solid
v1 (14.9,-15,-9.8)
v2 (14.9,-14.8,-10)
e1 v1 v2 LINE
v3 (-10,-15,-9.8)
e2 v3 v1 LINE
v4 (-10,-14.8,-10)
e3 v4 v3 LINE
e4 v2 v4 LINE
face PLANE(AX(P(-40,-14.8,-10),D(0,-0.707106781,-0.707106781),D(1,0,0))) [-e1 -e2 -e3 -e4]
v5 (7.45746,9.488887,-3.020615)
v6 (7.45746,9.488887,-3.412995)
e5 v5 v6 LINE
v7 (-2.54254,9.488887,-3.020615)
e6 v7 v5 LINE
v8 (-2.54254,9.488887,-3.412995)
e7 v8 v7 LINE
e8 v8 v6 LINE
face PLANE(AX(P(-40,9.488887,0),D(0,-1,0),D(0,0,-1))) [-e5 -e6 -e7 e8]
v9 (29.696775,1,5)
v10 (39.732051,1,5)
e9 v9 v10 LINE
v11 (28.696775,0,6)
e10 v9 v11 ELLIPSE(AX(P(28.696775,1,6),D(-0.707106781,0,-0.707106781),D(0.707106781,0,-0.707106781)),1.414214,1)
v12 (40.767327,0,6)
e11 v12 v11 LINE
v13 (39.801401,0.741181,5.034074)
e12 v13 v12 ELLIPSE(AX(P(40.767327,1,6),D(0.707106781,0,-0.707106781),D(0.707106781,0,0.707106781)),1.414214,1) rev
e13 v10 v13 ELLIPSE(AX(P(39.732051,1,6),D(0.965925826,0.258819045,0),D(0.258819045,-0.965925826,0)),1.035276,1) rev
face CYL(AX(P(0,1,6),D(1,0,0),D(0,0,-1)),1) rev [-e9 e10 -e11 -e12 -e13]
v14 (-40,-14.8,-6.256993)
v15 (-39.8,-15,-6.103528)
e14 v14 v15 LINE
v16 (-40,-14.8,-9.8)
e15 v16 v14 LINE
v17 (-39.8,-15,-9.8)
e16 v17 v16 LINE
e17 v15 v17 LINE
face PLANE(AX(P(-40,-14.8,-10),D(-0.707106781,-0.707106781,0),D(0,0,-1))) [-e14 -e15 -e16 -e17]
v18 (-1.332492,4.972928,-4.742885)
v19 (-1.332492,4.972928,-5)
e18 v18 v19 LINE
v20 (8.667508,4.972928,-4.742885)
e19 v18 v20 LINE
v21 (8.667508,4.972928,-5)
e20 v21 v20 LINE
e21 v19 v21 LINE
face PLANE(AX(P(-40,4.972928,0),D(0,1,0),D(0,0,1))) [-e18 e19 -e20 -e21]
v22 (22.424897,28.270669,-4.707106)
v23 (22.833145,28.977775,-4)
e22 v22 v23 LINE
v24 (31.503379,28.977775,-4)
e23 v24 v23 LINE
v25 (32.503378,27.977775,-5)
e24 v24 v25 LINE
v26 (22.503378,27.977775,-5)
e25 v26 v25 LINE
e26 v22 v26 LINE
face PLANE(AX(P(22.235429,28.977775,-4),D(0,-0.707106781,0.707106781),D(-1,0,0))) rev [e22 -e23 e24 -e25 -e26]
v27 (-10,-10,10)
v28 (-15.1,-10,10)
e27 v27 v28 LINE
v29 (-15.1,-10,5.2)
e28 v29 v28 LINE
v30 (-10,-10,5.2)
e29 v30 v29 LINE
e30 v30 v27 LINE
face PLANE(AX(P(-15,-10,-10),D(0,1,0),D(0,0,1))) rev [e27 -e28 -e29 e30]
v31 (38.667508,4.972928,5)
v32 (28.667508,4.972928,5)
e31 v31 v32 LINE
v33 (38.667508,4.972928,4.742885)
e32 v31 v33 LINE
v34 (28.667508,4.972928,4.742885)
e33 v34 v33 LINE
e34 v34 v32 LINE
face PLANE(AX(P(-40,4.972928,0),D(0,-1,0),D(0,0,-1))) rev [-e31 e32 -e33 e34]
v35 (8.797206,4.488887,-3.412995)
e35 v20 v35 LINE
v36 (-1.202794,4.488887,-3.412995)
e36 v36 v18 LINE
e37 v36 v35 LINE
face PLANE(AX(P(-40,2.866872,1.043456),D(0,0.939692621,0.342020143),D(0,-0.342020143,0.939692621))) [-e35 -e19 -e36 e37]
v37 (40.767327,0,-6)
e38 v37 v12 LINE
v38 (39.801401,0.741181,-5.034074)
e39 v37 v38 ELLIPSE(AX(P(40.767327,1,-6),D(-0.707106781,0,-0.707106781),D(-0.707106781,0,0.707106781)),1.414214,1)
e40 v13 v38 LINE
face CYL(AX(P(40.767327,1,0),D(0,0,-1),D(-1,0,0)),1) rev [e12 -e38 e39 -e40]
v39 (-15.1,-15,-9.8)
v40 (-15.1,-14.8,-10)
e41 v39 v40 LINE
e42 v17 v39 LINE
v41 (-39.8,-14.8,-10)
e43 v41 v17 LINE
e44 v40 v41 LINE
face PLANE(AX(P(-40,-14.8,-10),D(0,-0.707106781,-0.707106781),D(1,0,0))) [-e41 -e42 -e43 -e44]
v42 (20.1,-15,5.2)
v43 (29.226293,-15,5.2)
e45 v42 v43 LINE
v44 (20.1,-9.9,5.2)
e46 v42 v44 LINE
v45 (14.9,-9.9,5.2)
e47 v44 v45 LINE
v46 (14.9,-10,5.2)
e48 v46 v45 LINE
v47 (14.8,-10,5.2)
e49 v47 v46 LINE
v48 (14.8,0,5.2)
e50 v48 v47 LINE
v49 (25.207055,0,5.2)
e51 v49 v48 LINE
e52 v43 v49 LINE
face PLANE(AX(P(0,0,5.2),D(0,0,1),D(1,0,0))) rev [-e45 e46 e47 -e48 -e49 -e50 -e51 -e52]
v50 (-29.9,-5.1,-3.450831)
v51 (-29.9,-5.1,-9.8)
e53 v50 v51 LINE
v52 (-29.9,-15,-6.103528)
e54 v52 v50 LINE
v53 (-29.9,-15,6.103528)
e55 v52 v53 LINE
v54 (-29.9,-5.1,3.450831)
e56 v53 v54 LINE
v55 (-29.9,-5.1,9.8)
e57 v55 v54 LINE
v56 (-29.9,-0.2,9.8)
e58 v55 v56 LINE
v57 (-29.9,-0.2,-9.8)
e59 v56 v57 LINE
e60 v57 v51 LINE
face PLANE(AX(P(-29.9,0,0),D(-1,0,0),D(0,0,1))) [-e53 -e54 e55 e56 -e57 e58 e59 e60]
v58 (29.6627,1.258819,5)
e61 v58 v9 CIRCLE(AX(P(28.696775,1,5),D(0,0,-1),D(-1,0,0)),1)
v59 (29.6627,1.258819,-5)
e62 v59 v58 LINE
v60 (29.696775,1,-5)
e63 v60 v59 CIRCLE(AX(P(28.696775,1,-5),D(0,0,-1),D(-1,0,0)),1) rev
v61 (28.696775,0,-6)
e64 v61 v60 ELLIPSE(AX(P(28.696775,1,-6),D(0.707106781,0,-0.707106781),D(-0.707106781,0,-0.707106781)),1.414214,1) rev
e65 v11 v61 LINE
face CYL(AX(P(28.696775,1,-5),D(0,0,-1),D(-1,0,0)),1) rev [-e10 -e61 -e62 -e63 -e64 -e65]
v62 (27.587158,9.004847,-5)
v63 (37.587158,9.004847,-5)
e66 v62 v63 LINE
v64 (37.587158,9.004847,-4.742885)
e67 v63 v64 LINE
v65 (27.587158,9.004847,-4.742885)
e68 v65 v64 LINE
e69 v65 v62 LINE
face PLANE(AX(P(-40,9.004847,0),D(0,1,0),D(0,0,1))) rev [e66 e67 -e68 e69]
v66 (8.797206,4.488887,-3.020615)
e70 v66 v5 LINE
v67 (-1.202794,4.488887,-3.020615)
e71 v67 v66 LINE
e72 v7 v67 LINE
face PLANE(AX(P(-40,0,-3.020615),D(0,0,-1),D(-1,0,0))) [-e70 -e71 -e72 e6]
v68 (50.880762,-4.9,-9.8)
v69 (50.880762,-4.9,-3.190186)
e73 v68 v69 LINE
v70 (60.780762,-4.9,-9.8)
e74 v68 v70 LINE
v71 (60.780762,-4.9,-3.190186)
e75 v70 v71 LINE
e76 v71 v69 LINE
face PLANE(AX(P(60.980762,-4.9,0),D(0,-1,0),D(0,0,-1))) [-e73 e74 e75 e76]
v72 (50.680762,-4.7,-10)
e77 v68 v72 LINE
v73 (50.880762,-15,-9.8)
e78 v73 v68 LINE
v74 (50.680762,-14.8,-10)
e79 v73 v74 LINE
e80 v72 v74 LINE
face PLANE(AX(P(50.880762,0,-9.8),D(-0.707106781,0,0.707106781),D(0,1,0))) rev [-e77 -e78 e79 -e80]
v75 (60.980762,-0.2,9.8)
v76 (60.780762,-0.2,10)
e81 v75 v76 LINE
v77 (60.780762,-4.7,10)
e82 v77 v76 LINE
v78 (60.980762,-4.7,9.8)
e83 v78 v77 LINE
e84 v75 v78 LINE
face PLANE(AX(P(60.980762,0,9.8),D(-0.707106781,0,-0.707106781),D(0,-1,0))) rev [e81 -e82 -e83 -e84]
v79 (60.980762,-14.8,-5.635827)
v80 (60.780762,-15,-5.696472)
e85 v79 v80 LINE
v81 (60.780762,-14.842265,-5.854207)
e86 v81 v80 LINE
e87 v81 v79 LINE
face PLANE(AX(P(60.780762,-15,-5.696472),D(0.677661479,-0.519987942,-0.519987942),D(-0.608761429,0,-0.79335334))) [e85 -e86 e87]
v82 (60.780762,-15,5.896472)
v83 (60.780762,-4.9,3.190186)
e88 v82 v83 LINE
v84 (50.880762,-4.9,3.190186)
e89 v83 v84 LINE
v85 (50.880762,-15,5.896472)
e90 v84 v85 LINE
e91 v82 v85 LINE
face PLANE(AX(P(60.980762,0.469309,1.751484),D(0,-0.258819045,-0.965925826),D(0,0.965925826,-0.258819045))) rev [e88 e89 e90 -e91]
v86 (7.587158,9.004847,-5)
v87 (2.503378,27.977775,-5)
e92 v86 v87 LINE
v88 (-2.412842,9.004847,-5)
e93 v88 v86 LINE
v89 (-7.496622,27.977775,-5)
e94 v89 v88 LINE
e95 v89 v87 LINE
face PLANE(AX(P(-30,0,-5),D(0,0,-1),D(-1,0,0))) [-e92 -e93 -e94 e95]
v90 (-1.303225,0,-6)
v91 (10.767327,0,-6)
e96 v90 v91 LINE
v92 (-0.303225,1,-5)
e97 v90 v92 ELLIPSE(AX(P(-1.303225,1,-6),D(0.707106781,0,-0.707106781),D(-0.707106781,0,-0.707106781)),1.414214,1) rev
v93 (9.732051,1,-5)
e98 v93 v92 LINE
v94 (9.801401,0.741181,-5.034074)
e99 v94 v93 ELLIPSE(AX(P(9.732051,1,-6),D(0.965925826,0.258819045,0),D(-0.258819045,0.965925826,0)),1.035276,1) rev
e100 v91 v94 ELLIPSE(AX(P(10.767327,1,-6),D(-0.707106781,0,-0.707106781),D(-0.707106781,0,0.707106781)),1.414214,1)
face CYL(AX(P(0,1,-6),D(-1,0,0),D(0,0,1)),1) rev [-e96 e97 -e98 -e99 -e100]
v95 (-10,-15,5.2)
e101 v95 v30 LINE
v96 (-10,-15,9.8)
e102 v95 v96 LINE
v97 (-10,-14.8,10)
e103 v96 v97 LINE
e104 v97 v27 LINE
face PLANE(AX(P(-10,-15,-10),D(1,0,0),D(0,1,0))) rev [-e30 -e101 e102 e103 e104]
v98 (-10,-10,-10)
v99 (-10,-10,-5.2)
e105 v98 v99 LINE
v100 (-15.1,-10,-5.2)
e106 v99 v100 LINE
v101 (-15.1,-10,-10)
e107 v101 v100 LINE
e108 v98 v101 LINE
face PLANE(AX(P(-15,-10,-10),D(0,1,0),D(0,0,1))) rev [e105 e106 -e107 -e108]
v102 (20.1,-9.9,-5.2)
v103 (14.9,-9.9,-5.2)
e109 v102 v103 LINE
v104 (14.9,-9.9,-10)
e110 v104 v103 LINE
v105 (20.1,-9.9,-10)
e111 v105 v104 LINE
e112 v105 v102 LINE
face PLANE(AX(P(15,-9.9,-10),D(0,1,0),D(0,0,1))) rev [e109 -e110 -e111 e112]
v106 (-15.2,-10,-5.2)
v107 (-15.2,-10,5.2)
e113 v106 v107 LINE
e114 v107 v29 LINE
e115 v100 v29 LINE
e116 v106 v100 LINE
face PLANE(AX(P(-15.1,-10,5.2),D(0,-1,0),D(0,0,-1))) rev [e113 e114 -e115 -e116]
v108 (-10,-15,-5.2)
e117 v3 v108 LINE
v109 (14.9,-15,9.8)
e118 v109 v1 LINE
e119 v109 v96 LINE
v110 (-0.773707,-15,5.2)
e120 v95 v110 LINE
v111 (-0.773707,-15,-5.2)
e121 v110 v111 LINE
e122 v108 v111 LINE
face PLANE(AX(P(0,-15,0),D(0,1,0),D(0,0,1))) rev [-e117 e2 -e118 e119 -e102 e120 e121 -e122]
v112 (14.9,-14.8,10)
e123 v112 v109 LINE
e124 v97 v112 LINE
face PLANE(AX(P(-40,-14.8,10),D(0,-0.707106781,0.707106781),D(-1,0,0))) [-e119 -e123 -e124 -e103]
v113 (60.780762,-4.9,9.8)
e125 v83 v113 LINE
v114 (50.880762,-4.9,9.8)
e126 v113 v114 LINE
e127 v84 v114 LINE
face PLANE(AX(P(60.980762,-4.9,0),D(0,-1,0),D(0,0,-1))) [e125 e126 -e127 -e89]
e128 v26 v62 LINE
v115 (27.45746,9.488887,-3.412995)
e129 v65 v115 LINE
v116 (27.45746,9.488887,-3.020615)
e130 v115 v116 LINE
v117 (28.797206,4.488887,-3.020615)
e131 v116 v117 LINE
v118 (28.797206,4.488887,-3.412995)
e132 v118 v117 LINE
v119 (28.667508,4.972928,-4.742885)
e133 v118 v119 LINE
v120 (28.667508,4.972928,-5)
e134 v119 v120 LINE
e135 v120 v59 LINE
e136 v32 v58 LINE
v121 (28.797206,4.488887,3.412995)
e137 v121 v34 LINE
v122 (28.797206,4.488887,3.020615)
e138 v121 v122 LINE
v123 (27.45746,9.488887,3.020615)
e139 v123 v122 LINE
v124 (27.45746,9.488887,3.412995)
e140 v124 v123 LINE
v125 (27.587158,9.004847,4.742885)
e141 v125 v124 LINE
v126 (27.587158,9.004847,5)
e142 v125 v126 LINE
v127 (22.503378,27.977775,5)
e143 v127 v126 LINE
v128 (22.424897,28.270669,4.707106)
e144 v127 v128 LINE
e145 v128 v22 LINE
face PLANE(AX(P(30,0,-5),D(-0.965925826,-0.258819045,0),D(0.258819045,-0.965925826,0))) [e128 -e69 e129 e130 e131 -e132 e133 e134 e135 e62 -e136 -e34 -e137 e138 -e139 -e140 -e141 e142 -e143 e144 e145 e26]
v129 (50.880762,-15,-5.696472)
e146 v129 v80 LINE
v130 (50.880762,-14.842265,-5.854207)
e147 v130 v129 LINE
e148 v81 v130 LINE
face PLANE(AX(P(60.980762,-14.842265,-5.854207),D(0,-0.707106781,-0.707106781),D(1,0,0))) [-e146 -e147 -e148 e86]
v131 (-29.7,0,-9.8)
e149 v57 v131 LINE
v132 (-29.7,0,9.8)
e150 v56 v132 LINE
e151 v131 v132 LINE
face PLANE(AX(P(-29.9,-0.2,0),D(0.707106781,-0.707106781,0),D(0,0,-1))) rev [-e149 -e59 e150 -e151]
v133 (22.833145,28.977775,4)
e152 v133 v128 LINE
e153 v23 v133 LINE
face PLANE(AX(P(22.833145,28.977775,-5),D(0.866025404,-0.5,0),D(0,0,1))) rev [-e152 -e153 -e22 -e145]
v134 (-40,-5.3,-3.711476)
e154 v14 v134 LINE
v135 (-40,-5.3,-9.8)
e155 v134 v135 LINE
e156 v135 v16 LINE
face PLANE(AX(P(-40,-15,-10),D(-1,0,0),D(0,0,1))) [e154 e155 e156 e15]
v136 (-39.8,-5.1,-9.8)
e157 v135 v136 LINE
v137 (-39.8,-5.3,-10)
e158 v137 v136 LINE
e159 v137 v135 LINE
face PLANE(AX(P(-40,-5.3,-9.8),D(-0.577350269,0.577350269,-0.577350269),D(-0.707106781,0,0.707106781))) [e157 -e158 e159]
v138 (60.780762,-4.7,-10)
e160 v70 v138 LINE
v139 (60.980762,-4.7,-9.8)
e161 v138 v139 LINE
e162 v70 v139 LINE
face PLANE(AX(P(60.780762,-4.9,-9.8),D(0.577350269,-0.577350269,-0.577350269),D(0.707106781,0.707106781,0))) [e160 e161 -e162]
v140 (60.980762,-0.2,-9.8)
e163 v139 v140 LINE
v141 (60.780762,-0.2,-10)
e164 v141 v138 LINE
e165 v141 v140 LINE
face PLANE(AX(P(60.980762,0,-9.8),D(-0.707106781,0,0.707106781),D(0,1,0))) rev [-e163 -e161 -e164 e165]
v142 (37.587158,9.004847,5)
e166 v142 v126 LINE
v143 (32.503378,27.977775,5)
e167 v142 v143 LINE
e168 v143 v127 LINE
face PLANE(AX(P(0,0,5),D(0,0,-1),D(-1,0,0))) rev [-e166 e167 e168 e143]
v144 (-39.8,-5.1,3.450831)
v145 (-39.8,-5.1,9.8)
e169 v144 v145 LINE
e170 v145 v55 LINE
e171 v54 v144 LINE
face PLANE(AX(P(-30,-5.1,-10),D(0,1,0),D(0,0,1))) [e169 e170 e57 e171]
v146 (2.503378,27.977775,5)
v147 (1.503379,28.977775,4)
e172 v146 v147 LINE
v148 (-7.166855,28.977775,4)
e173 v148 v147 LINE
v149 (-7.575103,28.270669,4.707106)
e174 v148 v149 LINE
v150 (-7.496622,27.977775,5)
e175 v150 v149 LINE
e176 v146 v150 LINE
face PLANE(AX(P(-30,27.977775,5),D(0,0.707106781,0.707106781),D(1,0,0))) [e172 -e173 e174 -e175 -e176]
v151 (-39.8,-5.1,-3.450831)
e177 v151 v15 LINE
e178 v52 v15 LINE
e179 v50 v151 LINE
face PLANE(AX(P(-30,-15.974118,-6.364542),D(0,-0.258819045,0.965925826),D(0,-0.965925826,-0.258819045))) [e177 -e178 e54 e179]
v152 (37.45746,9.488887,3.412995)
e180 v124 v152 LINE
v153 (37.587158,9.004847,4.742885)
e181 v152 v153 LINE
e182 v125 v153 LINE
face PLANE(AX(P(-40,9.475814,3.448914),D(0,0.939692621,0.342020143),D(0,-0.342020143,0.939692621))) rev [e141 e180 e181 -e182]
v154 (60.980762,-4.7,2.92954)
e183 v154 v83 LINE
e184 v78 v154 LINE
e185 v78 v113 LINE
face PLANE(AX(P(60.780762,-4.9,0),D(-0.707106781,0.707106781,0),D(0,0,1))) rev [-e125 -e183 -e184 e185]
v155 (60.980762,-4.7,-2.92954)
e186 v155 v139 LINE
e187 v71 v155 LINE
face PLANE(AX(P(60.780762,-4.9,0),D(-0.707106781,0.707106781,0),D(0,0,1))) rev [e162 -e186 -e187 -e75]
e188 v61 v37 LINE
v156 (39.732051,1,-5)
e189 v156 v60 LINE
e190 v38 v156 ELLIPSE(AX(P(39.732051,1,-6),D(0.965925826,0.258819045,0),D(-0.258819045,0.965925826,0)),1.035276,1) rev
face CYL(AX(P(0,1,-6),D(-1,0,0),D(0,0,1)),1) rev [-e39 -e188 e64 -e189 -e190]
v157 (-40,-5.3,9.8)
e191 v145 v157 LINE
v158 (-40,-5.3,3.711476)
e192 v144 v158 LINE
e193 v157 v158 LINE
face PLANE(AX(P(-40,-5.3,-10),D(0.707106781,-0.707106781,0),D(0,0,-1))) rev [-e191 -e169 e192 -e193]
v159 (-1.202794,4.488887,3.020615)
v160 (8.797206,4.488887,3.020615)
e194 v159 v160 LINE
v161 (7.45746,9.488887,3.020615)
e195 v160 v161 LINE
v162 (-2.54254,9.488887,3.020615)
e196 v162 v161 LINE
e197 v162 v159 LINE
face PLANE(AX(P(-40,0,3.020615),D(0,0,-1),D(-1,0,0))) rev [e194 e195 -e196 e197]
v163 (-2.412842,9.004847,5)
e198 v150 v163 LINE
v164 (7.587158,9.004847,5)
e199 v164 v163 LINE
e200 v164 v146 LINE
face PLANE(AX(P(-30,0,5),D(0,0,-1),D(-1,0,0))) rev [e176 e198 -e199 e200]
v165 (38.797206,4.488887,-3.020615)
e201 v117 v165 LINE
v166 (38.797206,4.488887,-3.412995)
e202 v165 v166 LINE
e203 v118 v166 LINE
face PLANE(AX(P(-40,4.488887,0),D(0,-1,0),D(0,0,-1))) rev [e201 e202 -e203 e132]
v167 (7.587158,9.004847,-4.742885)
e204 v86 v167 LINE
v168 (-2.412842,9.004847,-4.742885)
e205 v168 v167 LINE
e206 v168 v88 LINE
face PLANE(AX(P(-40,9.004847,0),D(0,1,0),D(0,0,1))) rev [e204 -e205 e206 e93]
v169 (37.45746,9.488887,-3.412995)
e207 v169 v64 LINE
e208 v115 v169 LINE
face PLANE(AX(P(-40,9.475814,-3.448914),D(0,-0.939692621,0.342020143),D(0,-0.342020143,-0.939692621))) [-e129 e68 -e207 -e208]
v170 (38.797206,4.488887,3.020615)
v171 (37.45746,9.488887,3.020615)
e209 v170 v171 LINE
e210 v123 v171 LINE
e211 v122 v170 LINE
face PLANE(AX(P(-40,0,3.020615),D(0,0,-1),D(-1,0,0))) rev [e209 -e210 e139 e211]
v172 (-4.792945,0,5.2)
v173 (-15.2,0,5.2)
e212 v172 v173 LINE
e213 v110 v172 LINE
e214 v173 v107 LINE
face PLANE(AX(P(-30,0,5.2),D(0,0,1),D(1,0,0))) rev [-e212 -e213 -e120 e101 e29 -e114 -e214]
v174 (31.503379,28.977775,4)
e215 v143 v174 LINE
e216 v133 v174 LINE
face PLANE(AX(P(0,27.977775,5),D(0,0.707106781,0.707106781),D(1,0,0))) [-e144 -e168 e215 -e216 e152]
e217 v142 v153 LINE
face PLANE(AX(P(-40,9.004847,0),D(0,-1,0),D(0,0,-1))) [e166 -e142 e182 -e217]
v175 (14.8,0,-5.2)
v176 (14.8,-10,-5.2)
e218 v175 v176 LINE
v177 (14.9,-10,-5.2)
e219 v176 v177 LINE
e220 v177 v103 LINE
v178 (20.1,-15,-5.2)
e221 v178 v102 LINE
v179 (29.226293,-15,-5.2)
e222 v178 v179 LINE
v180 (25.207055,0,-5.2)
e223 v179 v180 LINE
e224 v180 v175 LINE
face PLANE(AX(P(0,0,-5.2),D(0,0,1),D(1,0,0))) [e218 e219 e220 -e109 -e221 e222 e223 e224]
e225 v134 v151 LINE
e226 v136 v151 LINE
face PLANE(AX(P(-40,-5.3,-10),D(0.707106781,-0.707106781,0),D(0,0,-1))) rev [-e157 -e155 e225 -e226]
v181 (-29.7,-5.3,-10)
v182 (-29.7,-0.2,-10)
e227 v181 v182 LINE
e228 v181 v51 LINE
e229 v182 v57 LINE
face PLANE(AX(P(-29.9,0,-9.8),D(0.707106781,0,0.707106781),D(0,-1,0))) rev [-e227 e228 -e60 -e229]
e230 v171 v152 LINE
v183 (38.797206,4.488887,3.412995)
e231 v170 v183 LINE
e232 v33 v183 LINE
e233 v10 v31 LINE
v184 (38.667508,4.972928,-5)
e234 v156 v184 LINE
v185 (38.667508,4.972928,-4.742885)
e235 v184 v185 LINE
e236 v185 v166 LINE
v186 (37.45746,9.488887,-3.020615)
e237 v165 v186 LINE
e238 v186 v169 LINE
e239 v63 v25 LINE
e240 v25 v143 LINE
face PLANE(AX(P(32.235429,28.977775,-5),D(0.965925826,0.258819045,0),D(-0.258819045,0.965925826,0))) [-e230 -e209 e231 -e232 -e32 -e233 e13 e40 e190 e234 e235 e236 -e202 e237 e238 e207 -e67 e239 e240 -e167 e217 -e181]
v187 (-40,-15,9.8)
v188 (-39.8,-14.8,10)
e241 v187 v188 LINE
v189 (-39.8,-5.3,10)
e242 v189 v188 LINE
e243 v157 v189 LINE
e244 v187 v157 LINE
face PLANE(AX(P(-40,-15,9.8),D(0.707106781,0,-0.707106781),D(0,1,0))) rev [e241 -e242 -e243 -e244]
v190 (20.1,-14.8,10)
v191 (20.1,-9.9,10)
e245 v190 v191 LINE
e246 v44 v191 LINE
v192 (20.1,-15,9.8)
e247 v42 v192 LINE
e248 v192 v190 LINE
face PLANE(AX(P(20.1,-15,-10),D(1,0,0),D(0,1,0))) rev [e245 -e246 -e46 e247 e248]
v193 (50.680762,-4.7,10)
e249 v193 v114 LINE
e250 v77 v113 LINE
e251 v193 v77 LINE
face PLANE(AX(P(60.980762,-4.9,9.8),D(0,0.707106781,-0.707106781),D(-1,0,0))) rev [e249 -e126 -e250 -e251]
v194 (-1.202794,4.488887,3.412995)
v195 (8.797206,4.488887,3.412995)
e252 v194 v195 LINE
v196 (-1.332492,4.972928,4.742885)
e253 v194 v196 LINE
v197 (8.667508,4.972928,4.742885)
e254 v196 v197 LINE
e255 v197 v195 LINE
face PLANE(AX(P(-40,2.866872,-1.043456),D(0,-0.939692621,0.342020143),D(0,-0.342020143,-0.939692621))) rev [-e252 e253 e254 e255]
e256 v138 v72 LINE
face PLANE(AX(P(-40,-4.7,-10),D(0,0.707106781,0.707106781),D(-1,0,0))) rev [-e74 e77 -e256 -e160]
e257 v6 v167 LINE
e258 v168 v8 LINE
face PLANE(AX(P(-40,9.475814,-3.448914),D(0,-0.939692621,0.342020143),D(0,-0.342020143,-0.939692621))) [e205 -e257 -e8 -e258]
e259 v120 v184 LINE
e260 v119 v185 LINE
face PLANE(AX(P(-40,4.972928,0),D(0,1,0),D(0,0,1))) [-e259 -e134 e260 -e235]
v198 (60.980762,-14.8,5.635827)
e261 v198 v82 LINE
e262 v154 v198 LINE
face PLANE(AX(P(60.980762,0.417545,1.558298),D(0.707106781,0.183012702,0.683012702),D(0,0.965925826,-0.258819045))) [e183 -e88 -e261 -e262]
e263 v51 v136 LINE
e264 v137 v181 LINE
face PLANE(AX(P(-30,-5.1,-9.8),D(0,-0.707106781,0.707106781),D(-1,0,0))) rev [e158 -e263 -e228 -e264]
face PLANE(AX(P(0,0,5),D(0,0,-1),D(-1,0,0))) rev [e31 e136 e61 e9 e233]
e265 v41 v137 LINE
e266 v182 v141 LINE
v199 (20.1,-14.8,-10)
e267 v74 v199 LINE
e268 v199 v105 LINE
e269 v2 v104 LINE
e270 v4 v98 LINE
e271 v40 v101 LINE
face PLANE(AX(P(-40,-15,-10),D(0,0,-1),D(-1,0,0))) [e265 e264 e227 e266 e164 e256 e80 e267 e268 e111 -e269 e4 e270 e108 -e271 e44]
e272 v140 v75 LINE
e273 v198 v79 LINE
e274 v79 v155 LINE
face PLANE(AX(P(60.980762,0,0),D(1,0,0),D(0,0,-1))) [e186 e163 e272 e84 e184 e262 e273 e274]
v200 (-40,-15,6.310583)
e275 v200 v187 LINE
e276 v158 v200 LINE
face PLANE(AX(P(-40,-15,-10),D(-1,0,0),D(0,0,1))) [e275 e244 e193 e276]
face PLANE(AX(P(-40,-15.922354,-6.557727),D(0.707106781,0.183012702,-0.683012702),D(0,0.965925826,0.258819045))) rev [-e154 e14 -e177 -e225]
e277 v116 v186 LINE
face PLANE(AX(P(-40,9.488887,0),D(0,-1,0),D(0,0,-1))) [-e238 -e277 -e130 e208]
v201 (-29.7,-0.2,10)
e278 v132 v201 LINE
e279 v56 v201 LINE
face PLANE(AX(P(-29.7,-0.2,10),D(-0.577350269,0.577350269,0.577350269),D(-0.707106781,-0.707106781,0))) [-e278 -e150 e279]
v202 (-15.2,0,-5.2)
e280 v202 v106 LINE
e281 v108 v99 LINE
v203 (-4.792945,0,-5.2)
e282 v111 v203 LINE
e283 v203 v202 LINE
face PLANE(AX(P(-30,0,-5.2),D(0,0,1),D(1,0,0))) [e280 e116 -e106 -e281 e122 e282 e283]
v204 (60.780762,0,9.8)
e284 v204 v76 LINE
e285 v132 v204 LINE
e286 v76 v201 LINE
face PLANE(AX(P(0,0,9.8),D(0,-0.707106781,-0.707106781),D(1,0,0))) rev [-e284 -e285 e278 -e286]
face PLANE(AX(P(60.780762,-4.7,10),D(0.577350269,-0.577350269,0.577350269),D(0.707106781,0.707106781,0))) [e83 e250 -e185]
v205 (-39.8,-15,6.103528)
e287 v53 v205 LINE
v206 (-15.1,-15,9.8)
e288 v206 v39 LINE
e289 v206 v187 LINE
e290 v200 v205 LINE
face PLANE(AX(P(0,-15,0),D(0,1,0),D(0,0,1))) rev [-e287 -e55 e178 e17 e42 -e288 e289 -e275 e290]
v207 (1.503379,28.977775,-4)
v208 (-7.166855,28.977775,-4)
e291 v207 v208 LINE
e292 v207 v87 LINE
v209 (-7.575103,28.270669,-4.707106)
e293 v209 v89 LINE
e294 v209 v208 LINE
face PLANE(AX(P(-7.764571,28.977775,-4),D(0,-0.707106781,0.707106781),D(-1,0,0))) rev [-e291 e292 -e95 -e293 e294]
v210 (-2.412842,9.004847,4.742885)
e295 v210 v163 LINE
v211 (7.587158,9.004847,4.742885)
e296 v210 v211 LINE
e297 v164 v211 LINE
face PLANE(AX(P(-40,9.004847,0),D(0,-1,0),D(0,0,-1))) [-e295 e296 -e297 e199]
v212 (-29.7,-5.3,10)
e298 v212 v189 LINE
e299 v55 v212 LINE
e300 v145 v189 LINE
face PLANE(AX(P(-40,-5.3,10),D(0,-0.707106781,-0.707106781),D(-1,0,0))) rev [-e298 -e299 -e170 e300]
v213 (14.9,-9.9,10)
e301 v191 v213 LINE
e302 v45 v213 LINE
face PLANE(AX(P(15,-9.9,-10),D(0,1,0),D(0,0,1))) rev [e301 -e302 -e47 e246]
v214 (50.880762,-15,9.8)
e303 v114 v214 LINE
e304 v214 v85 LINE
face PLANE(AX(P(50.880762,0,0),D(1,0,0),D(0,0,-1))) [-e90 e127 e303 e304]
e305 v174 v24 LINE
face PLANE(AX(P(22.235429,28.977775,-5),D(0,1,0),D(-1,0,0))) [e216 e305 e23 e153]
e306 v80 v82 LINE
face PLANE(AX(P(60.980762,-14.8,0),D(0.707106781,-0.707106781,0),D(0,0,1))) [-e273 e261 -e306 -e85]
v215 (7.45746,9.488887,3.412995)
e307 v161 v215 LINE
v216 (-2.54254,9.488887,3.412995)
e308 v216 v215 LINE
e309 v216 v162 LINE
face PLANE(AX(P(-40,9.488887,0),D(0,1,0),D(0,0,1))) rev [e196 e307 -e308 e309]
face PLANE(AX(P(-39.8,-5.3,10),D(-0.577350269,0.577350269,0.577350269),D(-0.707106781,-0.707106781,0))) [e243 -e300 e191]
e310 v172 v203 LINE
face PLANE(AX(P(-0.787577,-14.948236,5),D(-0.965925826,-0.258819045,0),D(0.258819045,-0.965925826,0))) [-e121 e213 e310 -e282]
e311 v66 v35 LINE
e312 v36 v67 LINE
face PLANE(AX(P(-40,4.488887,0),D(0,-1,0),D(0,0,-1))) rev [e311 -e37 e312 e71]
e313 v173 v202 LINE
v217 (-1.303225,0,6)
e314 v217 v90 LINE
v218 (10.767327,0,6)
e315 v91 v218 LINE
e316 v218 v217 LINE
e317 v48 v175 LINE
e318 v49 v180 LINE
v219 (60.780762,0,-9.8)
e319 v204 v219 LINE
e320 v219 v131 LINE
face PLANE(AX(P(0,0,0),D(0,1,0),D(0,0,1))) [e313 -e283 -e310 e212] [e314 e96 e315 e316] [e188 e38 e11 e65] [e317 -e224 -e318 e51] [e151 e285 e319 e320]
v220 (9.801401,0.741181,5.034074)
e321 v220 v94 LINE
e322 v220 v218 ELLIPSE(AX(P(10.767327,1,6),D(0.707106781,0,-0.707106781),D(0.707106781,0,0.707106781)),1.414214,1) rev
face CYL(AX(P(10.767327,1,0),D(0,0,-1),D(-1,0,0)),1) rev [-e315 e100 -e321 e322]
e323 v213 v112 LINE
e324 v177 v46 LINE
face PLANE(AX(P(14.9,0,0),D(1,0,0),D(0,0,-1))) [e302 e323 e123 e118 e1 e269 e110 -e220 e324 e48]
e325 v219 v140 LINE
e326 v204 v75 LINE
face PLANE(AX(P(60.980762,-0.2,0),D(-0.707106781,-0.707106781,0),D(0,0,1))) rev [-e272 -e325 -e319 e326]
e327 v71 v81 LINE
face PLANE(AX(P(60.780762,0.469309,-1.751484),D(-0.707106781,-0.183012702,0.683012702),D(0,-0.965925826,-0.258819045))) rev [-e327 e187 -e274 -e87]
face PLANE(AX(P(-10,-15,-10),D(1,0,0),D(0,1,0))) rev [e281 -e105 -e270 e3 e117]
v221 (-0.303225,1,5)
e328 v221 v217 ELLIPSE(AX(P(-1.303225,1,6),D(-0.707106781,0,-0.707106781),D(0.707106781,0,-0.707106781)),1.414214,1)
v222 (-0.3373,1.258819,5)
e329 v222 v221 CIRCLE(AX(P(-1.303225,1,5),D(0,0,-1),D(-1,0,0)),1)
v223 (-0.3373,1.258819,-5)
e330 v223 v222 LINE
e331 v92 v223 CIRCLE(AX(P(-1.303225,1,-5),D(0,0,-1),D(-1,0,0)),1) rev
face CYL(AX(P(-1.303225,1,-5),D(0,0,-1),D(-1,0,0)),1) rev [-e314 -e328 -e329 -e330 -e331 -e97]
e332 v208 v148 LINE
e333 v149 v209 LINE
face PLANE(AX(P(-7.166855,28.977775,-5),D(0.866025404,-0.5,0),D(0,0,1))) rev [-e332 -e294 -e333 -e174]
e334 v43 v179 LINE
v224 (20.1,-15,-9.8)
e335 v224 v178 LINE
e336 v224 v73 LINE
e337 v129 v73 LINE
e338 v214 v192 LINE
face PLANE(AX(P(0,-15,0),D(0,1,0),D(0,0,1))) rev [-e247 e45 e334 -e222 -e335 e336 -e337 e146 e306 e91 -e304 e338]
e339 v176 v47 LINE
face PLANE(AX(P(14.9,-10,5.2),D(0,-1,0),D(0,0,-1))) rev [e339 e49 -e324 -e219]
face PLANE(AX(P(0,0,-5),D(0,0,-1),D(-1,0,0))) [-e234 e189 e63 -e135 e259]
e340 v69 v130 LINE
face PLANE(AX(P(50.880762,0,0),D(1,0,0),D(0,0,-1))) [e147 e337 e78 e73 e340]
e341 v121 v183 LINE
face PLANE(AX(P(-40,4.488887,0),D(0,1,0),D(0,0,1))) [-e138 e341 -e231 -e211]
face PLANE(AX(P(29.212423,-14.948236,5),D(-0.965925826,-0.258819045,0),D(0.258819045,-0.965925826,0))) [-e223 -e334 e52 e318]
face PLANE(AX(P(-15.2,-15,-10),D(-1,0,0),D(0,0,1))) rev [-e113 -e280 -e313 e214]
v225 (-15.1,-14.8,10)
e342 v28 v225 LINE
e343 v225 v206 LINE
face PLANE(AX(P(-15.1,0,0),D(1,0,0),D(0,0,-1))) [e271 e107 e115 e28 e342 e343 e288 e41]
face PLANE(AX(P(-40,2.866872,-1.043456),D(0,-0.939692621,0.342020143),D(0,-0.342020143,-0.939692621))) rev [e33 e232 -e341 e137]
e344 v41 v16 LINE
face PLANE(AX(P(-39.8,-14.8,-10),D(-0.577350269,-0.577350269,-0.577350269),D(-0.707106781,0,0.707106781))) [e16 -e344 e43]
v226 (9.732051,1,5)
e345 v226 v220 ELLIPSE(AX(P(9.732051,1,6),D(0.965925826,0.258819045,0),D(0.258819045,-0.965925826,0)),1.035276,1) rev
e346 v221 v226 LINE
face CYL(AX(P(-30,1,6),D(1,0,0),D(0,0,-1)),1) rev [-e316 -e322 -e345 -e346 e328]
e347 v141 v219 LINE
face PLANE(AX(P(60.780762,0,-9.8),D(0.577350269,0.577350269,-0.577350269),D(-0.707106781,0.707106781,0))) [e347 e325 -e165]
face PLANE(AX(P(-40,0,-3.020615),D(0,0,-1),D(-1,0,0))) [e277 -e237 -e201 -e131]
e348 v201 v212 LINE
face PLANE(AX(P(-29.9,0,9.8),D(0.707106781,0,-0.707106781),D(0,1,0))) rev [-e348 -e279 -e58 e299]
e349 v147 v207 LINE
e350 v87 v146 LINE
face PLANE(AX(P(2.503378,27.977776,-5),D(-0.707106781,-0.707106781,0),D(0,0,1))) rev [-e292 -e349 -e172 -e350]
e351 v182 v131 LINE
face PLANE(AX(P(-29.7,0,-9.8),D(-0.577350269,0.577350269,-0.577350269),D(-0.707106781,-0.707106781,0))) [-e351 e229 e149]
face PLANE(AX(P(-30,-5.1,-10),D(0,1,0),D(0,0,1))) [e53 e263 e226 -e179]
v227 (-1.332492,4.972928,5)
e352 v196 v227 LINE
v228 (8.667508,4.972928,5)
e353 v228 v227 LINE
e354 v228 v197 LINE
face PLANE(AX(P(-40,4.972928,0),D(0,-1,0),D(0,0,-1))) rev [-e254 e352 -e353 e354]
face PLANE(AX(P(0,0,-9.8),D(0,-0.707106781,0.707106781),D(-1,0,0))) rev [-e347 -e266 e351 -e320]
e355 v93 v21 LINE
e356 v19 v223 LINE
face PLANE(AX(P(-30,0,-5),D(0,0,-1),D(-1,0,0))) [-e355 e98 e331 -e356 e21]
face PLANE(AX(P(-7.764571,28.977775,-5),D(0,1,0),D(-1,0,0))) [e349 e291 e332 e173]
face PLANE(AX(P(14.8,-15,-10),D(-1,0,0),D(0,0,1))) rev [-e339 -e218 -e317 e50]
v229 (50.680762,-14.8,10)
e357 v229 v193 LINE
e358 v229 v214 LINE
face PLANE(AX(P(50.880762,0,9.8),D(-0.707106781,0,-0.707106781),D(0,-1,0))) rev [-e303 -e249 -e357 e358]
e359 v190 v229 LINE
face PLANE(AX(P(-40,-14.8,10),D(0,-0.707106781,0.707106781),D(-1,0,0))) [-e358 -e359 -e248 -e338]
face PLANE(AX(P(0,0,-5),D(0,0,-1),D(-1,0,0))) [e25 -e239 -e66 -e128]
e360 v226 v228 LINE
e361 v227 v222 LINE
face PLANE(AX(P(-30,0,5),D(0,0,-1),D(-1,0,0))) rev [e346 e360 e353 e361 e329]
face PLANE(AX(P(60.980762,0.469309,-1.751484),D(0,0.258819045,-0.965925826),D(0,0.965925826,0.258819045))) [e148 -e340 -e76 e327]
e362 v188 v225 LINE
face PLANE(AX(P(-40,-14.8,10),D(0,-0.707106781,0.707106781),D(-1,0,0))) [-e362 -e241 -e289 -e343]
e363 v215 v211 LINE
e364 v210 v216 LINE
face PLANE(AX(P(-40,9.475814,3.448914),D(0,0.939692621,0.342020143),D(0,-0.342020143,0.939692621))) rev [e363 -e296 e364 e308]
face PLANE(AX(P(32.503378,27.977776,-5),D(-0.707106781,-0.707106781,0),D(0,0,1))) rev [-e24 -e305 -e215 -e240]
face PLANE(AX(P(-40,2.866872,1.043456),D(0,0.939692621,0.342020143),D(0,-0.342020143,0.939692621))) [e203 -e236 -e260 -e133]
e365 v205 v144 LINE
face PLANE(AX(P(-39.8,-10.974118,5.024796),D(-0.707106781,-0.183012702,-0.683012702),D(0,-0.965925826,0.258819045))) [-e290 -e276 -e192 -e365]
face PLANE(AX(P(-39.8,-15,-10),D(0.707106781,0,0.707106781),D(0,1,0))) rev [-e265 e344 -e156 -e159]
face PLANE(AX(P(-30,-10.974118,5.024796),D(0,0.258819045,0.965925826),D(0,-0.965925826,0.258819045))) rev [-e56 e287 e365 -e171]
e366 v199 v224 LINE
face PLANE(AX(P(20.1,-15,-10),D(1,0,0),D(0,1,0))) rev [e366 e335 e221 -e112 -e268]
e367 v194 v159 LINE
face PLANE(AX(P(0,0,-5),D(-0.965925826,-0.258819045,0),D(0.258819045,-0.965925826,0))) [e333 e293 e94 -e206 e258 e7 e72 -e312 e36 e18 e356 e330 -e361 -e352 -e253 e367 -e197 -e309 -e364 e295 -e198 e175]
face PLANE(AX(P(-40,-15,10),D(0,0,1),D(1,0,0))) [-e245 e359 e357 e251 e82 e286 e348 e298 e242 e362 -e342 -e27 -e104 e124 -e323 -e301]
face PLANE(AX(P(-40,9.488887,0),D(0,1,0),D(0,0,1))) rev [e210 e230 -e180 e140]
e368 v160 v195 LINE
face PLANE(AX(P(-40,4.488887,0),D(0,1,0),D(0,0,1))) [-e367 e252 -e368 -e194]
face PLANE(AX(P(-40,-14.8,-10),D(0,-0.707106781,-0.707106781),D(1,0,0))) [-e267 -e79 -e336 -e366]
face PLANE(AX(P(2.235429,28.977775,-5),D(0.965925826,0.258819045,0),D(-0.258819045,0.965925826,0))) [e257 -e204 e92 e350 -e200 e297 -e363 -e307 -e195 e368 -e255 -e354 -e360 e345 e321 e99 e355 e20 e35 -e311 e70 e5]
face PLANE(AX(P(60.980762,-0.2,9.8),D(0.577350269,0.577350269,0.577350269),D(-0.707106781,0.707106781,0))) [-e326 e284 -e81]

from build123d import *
from OCP.BRepFilletAPI import BRepFilletAPI_MakeChamfer

# Parameters (mm, degrees)
SKETCH2_W                     = 80
SKETCH2_H                     = 20
BOSS_EXTRUDE1_DEPTH           = 15
BOSS_EXTRUDE2_DEPTH           = 5
CUT_EXTRUDE1_DEPTH            = 5
SKETCH6_W                     = 5
SKETCH6_H                     = 5
CUT_EXTRUDE2_DEPTH            = 51.395549721
SLOT_EXTRUDE_DEPTH            = 51.395549721
SKETCH10_W                    = 5
SKETCH10_H                    = 10
CUT_EXTRUDE8_DEPTH            = 5
BOSS_EXTRUDE3_DEPTH           = 20.980762114
FILLET1_R                     = 1
CHAMFER1_SIZE                 = 1
CHAMFER2_SIZE                 = 0.73205
CHAMFER2_SIZE2                = 0.597716322
CHAMFER2_SIZE2_2              = 1.035275038
LPATTERN1_COUNT               = 2
LPATTERN1_PITCH               = 30
FILLET1_OF_LPATTERN1_R        = 1
CHAMFER1_OF_LPATTERN1_SIZE    = 1
CHAMFER2_OF_LPATTERN1_SIZE    = 0.73205
CHAMFER2_OF_LPATTERN1_SIZE2   = 0.597716322
CHAMFER2_OF_LPATTERN1_SIZE2_2 = 1.035275038
BOSS_EXTRUDE4_DEPTH           = 10.980762114
CUT_EXTRUDE9_START            = -80
CUT_EXTRUDE9_DEPTH            = 10
MOVE_START                    = -5.2
MOVE_FACE1_DEPTH              = 10.4
MOVE_START_2                  = -10
MOVE_FACE1_2_OUTLINE_W        = 0.2
MOVE_FACE1_2_OUTLINE_H        = 5
MOVE_FACE1_2_DEPTH            = 20
MOVE_START_3                  = -40
MOVE_FACE2_DEPTH              = 10.1
MOVE_START_4                  = 50.880762114
MOVE_FACE2_2_DEPTH            = 10.1
BOSS_EXTRUDE5_DEPTH           = 0.1
MOVE_FACE3_BY                 = 0.1
MOVE_FACE3_2_BY               = 0.1
MOVE_FACE3_3_BY               = 0.1
MOVE_FACE3_4_BY               = 0.1
BOSS_EXTRUDE6_DEPTH           = 0.1
MOVE_START_5                  = -2.542539714
MOVE_FACE5_DEPTH              = 41.339745962
CHAMFER3_SIZE                 = 0.2
CHAMFER3_SIZE2                = 0.163299316


# Read off the part's stored shape, not the designer's step: Move Face1, Move Face2, Move Face5
with BuildPart() as part:
    # Sketch2 → Boss-Extrude1 (new body)
    with BuildSketch(Plane(origin=(0, 0, 0), x_dir=(1, 0, 0), z_dir=(0, 1, 0))):
        Rectangle(SKETCH2_W, SKETCH2_H)
    extrude(amount=-BOSS_EXTRUDE1_DEPTH)

    # Sketch3 → Boss-Extrude2 (add, symmetric)
    with BuildSketch(Plane.XY):
        Polygon((40, 0), (30, 0), (22.235428647, 28.977774789), (32.235428647, 28.977774789), align=None)
    boss_extrude2 = extrude(amount=BOSS_EXTRUDE2_DEPTH, both=True)

    # Sketch4 → Cut-Extrude1 (cut, symmetric)
    with BuildSketch(Plane.XY):
        Polygon((19.019237886, -15), (29.019237886, -15), (25, 0), (15, 0), align=None)
    cut_extrude1 = extrude(amount=CUT_EXTRUDE1_DEPTH, both=True, mode=Mode.SUBTRACT)

    # Sketch6 → Cut-Extrude2 (cut, symmetric)
    with BuildSketch(Plane.XY):
        with Locations((17.5, -12.5)):
            Rectangle(SKETCH6_W, SKETCH6_H)
    cut_extrude2 = extrude(amount=CUT_EXTRUDE2_DEPTH, both=True, mode=Mode.SUBTRACT)

    # Sketch8 → Slot Extrude (cut, symmetric)
    with BuildSketch(Plane(origin=(0, 0, 0), x_dir=(0, 0, -1), z_dir=(1, 0, 0))):
        Polygon((-4.725252258, 8.904847108), (-5, 8.804847108), (-5, 6.988887394), (-3.120614758, 6.988887394), (-3.120614758, 9.388887394), (-3.3953625, 9.388887394), align=None)
        Polygon((-3.120614758, 6.988887394), (-5, 6.988887394), (-5, 5.172927681), (-4.725252258, 5.072927681), (-3.3953625, 4.588887394), (-3.120614758, 4.588887394), align=None)
        Polygon((5, 5.172927681), (5, 8.804847108), (4.725252258, 8.904847108), (3.3953625, 9.388887394), (3.120614758, 9.388887394), (3.120614758, 4.588887394), (3.3953625, 4.588887394), (4.725252258, 5.072927681), align=None)
        Polygon((4.725252258, 8.904847108), (5, 8.804847108), (5, 8.904847108), align=None)
        Polygon((5, 5.072927681), (5, 5.172927681), (4.725252258, 5.072927681), align=None)
        Polygon((-5, 8.904847108), (-5, 8.804847108), (-4.725252258, 8.904847108), align=None)
        Polygon((-4.725252258, 5.072927681), (-5, 5.172927681), (-5, 5.072927681), align=None)
    slot_extrude = extrude(amount=SLOT_EXTRUDE_DEPTH, both=True, mode=Mode.SUBTRACT)

    # Sketch10 → Cut-Extrude8 (cut, symmetric)
    with BuildSketch(Plane.XY):
        with Locations((17.5, -5)):
            Rectangle(SKETCH10_W, SKETCH10_H)
    cut_extrude8 = extrude(amount=CUT_EXTRUDE8_DEPTH, both=True, mode=Mode.SUBTRACT)

    # Sketch12 → Boss-Extrude3 (add)
    with BuildSketch(Plane(origin=(40, 0, 0), x_dir=(0, 0, -1), z_dir=(1, 0, 0))):
        Polygon((6, -15), (3.320508076, -5), (-3.320508076, -5), (-6, -15), (0, -15), align=None)
        Polygon((10, -5), (10, 0), (5, 0), (-5, 0), (-10, 0), (-10, -5), (-3.320508076, -5), (3.320508076, -5), align=None)
    extrude(amount=BOSS_EXTRUDE3_DEPTH)

    # Fillet1
    fillet1_edges = [part.edges().sort_by_distance(p)[0] for p in [
        (30, 0, 0),
        (40, 0, 0),
        (35, 0, -5),
        (35, 0, 5),
    ]]
    fillet(fillet1_edges, radius=FILLET1_R)

    # Chamfer1
    chamfer1_edges = [part.edges().sort_by_distance(p)[0] for p in [
        (27.235428647, 28.977774789, -5),
        (27.235428647, 28.977774789, 5),
    ]]
    chamfer(chamfer1_edges, length=CHAMFER1_SIZE)

    # Chamfer2: one chamfer whose edges measure the first distance from different faces: ONE call of the kernel's chamfer builder (chamfer() names one face for all edges)
    chamfer2_edges_1 = [part.edges().sort_by_distance(p)[0] for p in [
        (22.235428647, 28.977774789, 0),
    ]]
    chamfer2_side_1 = [part.faces().sort_by_distance(p)[0] for p in [
        (25.827075596, 15.57356589, 0),
    ]]
    chamfer2_edges_2 = [part.edges().sort_by_distance(p)[0] for p in [
        (32.235428647, 28.977774789, 0),
    ]]
    chamfer2_side_2 = [part.faces().sort_by_distance(p)[0] for p in [
        (27.235428647, 28.977774789, 0),
    ]]
    chamfer2 = BRepFilletAPI_MakeChamfer(part.part.solid().wrapped)
    for e in chamfer2_edges_1:
        chamfer2.Add(CHAMFER2_SIZE, CHAMFER2_SIZE2, e.wrapped, chamfer2_side_1[0].wrapped)  # the first distance lies on this face
    for e in chamfer2_edges_2:
        chamfer2.Add(CHAMFER2_SIZE, CHAMFER2_SIZE2_2, e.wrapped, chamfer2_side_2[0].wrapped)  # the first distance lies on this face
    add(Compound.cast(chamfer2.Shape()), mode=Mode.REPLACE)

    # LPattern1: Boss-Extrude2, Cut-Extrude1, Cut-Extrude2, Slot Extrude, Cut-Extrude8 ×2
    with Locations(*[(-i * LPATTERN1_PITCH, 0, 0) for i in range(1, LPATTERN1_COUNT)]):
        add(boss_extrude2)
        add(cut_extrude1, mode=Mode.SUBTRACT)
        add(cut_extrude2, mode=Mode.SUBTRACT)
        add(slot_extrude, mode=Mode.SUBTRACT)
        add(cut_extrude8, mode=Mode.SUBTRACT)

    # Fillet1 of LPattern1
    fillet1_of_lpattern1_edges = [part.edges().sort_by_distance(p)[0] for p in [
        (0, 0, 0),
        (10, 0, 0),
        (5, 0, -5),
        (5, 0, 5),
    ]]
    fillet(fillet1_of_lpattern1_edges, radius=FILLET1_OF_LPATTERN1_R)

    # Chamfer1 of LPattern1
    chamfer1_of_lpattern1_edges = [part.edges().sort_by_distance(p)[0] for p in [
        (-2.764571353, 28.977774789, -5),
        (-2.764571353, 28.977774789, 5),
    ]]
    chamfer(chamfer1_of_lpattern1_edges, length=CHAMFER1_OF_LPATTERN1_SIZE)

    # Chamfer2 of LPattern1: one chamfer whose edges measure the first distance from different faces: ONE call of the kernel's chamfer builder (chamfer() names one face for all edges)
    chamfer2_of_lpattern1_edges_1 = [part.edges().sort_by_distance(p)[0] for p in [
        (-7.764571353, 28.977774789, 0),
    ]]
    chamfer2_of_lpattern1_side_1 = [part.faces().sort_by_distance(p)[0] for p in [
        (-4.172924404, 15.57356589, 0),
    ]]
    chamfer2_of_lpattern1_edges_2 = [part.edges().sort_by_distance(p)[0] for p in [
        (2.235428647, 28.977774789, 0),
    ]]
    chamfer2_of_lpattern1_side_2 = [part.faces().sort_by_distance(p)[0] for p in [
        (-2.764571353, 28.977774789, 0),
    ]]
    chamfer2_of_lpattern1 = BRepFilletAPI_MakeChamfer(part.part.solid().wrapped)
    for e in chamfer2_of_lpattern1_edges_1:
        chamfer2_of_lpattern1.Add(CHAMFER2_OF_LPATTERN1_SIZE, CHAMFER2_OF_LPATTERN1_SIZE2, e.wrapped, chamfer2_of_lpattern1_side_1[0].wrapped)  # the first distance lies on this face
    for e in chamfer2_of_lpattern1_edges_2:
        chamfer2_of_lpattern1.Add(CHAMFER2_OF_LPATTERN1_SIZE, CHAMFER2_OF_LPATTERN1_SIZE2_2, e.wrapped, chamfer2_of_lpattern1_side_2[0].wrapped)  # the first distance lies on this face
    add(Compound.cast(chamfer2_of_lpattern1.Shape()), mode=Mode.REPLACE)

    # Sketch12<5> → Boss-Extrude4 (add)
    with BuildSketch(Plane(origin=(40, 0, 0), x_dir=(0, 0, -1), z_dir=(1, 0, 0))):
        Polygon((10, -15), (10, -5), (3.320508076, -5), (6, -15), align=None)
        Polygon((-6, -15), (-3.320508076, -5), (-10, -5), (-10, -15), align=None)
    extrude(amount=BOSS_EXTRUDE4_DEPTH)

    # Sketch12<6> → Cut-Extrude9 (cut)
    with BuildSketch(Plane(origin=(40, 0, 0), x_dir=(0, 0, -1), z_dir=(1, 0, 0)).offset(CUT_EXTRUDE9_START)):
        Polygon((6, -15), (3.320508076, -5), (-3.320508076, -5), (-6, -15), (0, -15), align=None)
        Polygon((10, -5), (10, 0), (5, 0), (-5, 0), (-10, 0), (-10, -5), (-3.320508076, -5), (3.320508076, -5), align=None)
    extrude(amount=CUT_EXTRUDE9_DEPTH, mode=Mode.SUBTRACT)

    # Move Face1 outline → Move Face1 (cut)
    with BuildSketch(Plane.XY.offset(MOVE_START)):
        Polygon((29.226293123, -15), (25.207055236, 0), (14.8, 0), (14.8, -15), (15, -15), (15, -10), (20, -10), (20, -15), align=None)
        Polygon((-0.773706877, -15), (-4.792944764, 0), (-15.2, 0), (-15.2, -15), (-15, -15), (-15, -10), (-10, -10), (-10, -15), align=None)
    extrude(amount=MOVE_FACE1_DEPTH, mode=Mode.SUBTRACT)

    # Move Face1 2 outline → Move Face1 2 (cut)
    with BuildSketch(Plane.XY.offset(MOVE_START_2)):
        with Locations((14.9, -12.5)):
            Rectangle(MOVE_FACE1_2_OUTLINE_W, MOVE_FACE1_2_OUTLINE_H)
        with Locations((-15.1, -12.5)):
            Rectangle(MOVE_FACE1_2_OUTLINE_W, MOVE_FACE1_2_OUTLINE_H)
    extrude(amount=MOVE_FACE1_2_DEPTH, mode=Mode.SUBTRACT)

    # Move Face2 outline → Move Face2 (cut)
    with BuildSketch(Plane.YZ.offset(MOVE_START_3)):
        Polygon((-15, -6.103527618), (-5.1, -3.450830613), (-5.1, -10), (0, -10), (0, 10), (-5.1, 10), (-5.1, 3.450830613), (-15, 6.103527618), align=None)
    extrude(amount=MOVE_FACE2_DEPTH, mode=Mode.SUBTRACT)

    # Move Face2 2 outline → Move Face2 2 (cut)
    with BuildSketch(Plane.YZ.offset(MOVE_START_4)):
        Polygon((-4.9, -3.190185538), (-15, -5.896472382), (-15, -10), (-4.9, -10), align=None)
        Polygon((-15, 5.896472382), (-4.9, 3.190185538), (-4.9, 10), (-15, 10), align=None)
    extrude(amount=MOVE_FACE2_2_DEPTH, mode=Mode.SUBTRACT)

    # Sketch13 → Boss-Extrude5 (add)
    with BuildSketch(Plane(origin=(14.8, 0, 0), x_dir=(0, 0, -1), z_dir=(1, 0, 0))):
        Polygon((5.2, -10), (-5.2, -10), (-10, -10), (-10, -15), (10, -15), (10, -10), align=None)
    extrude(amount=BOSS_EXTRUDE5_DEPTH)

    # Move Face3: a face moved inward by 0.1
    extrude(part.faces().sort_by_distance((17.45, -10, 7.6))[0], amount=MOVE_FACE3_BY, dir=(0, 1, 0), mode=Mode.SUBTRACT)

    # Move Face3 2: a face moved inward by 0.1
    extrude(part.faces().sort_by_distance((20, -12.5, 7.6))[0], amount=MOVE_FACE3_2_BY, dir=(1, 0, 0), mode=Mode.SUBTRACT)

    # Move Face3 3: a face moved inward by 0.1
    extrude(part.faces().sort_by_distance((20, -12.5, -7.6))[0], amount=MOVE_FACE3_3_BY, dir=(1, 0, 0), mode=Mode.SUBTRACT)

    # Move Face3 4: a face moved inward by 0.1
    extrude(part.faces().sort_by_distance((17.45, -10, -7.6))[0], amount=MOVE_FACE3_4_BY, dir=(0, 1, 0), mode=Mode.SUBTRACT)

    # Sketch16 → Boss-Extrude6 (add)
    with BuildSketch(Plane(origin=(-15.2, 0, 0), x_dir=(0, 0, -1), z_dir=(1, 0, 0))):
        Polygon((5.2, -10), (-5.2, -10), (-10, -10), (-10, -15), (10, -15), (10, -10), align=None)
    extrude(amount=BOSS_EXTRUDE6_DEPTH)

    # Move Face5 outline → Move Face5 (cut)
    with BuildSketch(Plane.YZ.offset(MOVE_START_5)):
        Polygon((9.004847108, 4.742884956), (9.004847108, 5), (8.904847108, 5), (8.904847108, 4.725252258), (9.388887394, 3.3953625), (9.388887394, 3.120614758), (4.588887394, 3.120614758), (4.588887394, 3.3953625), (5.072927681, 4.725252258), (5.072927681, 5), (4.972927681, 5), (4.972927681, 4.742884956), (4.488887394, 3.412995198), (4.488887394, 3.020614758), (9.488887394, 3.020614758), (9.488887394, 3.412995198), align=None)
        Polygon((8.904847108, -5), (9.004847108, -5), (9.004847108, -4.742884956), (9.488887394, -3.412995198), (9.488887394, -3.020614758), (4.488887394, -3.020614758), (4.488887394, -3.412995198), (4.972927681, -4.742884956), (4.972927681, -5), (5.072927681, -5), (5.072927681, -4.725252258), (4.588887394, -3.3953625), (4.588887394, -3.120614758), (9.388887394, -3.120614758), (9.388887394, -3.3953625), (8.904847108, -4.725252258), align=None)
    extrude(amount=MOVE_FACE5_DEPTH, mode=Mode.SUBTRACT)

    # Chamfer3: one chamfer whose edges measure the first distance from different faces: ONE call of the kernel's chamfer builder (chamfer() names one face for all edges)
    chamfer3_edges_1 = [part.edges().sort_by_distance(p)[0] for p in [
        (35.490381057, -15, -10),
        (60.980762114, -9.95, -4.54332896),
        (60.980762114, -4.9, -6.595092769),
        (55.930762114, -4.9, -10),
        (60.980762114, -4.9, 6.595092769),
        (55.930762114, -4.9, 10),
        (60.980762114, -2.45, -10),
        (60.980762114, 0, 0),
        (60.980762114, -2.45, 10),
        (60.980762114, -9.95, 4.54332896),
        (60.980762114, -15, 0),
        (2.45, -15, 10),
        (-27.55, -15, -10),
        (2.45, -15, -10),
        (35.490381057, -15, 10),
        (-40, -15, -8.051763809),
        (15.540381057, 0, -10),
        (50.880762114, -9.95, 10),
        (50.880762114, -9.95, -10),
        (15.540381057, 0, 10),
        (-40, -5.1, 6.725415307),
        (-34.95, -5.1, 10),
        (-40, -10.05, -4.777179116),
        (-40, -5.1, -6.725415307),
        (-29.9, -2.55, -10),
        (-34.95, -5.1, -10),
        (-29.9, 0, 0),
        (-29.9, -2.55, 10),
        (-40, -10.05, 4.777179116),
        (-40, -10.05, -10),
        (-40, -10.05, 10),
        (-27.55, -15, 10),
    ]]
    chamfer3_edges_2 = [part.edges().sort_by_distance(p)[0] for p in [
        (55.930762114, -15, -5.896472382),
    ]]
    chamfer3_side_2 = [part.faces().sort_by_distance(p)[0] for p in [
        (40.901792788, -15, 0),
    ]]
    chamfer3 = BRepFilletAPI_MakeChamfer(part.part.solid().wrapped)
    for e in chamfer3_edges_1:
        chamfer3.Add(CHAMFER3_SIZE, e.wrapped)
    for e in chamfer3_edges_2:
        chamfer3.Add(CHAMFER3_SIZE, CHAMFER3_SIZE2, e.wrapped, chamfer3_side_2[0].wrapped)  # the first distance lies on this face
    add(Compound.cast(chamfer3.Shape()), mode=Mode.REPLACE)


solid = part.part
